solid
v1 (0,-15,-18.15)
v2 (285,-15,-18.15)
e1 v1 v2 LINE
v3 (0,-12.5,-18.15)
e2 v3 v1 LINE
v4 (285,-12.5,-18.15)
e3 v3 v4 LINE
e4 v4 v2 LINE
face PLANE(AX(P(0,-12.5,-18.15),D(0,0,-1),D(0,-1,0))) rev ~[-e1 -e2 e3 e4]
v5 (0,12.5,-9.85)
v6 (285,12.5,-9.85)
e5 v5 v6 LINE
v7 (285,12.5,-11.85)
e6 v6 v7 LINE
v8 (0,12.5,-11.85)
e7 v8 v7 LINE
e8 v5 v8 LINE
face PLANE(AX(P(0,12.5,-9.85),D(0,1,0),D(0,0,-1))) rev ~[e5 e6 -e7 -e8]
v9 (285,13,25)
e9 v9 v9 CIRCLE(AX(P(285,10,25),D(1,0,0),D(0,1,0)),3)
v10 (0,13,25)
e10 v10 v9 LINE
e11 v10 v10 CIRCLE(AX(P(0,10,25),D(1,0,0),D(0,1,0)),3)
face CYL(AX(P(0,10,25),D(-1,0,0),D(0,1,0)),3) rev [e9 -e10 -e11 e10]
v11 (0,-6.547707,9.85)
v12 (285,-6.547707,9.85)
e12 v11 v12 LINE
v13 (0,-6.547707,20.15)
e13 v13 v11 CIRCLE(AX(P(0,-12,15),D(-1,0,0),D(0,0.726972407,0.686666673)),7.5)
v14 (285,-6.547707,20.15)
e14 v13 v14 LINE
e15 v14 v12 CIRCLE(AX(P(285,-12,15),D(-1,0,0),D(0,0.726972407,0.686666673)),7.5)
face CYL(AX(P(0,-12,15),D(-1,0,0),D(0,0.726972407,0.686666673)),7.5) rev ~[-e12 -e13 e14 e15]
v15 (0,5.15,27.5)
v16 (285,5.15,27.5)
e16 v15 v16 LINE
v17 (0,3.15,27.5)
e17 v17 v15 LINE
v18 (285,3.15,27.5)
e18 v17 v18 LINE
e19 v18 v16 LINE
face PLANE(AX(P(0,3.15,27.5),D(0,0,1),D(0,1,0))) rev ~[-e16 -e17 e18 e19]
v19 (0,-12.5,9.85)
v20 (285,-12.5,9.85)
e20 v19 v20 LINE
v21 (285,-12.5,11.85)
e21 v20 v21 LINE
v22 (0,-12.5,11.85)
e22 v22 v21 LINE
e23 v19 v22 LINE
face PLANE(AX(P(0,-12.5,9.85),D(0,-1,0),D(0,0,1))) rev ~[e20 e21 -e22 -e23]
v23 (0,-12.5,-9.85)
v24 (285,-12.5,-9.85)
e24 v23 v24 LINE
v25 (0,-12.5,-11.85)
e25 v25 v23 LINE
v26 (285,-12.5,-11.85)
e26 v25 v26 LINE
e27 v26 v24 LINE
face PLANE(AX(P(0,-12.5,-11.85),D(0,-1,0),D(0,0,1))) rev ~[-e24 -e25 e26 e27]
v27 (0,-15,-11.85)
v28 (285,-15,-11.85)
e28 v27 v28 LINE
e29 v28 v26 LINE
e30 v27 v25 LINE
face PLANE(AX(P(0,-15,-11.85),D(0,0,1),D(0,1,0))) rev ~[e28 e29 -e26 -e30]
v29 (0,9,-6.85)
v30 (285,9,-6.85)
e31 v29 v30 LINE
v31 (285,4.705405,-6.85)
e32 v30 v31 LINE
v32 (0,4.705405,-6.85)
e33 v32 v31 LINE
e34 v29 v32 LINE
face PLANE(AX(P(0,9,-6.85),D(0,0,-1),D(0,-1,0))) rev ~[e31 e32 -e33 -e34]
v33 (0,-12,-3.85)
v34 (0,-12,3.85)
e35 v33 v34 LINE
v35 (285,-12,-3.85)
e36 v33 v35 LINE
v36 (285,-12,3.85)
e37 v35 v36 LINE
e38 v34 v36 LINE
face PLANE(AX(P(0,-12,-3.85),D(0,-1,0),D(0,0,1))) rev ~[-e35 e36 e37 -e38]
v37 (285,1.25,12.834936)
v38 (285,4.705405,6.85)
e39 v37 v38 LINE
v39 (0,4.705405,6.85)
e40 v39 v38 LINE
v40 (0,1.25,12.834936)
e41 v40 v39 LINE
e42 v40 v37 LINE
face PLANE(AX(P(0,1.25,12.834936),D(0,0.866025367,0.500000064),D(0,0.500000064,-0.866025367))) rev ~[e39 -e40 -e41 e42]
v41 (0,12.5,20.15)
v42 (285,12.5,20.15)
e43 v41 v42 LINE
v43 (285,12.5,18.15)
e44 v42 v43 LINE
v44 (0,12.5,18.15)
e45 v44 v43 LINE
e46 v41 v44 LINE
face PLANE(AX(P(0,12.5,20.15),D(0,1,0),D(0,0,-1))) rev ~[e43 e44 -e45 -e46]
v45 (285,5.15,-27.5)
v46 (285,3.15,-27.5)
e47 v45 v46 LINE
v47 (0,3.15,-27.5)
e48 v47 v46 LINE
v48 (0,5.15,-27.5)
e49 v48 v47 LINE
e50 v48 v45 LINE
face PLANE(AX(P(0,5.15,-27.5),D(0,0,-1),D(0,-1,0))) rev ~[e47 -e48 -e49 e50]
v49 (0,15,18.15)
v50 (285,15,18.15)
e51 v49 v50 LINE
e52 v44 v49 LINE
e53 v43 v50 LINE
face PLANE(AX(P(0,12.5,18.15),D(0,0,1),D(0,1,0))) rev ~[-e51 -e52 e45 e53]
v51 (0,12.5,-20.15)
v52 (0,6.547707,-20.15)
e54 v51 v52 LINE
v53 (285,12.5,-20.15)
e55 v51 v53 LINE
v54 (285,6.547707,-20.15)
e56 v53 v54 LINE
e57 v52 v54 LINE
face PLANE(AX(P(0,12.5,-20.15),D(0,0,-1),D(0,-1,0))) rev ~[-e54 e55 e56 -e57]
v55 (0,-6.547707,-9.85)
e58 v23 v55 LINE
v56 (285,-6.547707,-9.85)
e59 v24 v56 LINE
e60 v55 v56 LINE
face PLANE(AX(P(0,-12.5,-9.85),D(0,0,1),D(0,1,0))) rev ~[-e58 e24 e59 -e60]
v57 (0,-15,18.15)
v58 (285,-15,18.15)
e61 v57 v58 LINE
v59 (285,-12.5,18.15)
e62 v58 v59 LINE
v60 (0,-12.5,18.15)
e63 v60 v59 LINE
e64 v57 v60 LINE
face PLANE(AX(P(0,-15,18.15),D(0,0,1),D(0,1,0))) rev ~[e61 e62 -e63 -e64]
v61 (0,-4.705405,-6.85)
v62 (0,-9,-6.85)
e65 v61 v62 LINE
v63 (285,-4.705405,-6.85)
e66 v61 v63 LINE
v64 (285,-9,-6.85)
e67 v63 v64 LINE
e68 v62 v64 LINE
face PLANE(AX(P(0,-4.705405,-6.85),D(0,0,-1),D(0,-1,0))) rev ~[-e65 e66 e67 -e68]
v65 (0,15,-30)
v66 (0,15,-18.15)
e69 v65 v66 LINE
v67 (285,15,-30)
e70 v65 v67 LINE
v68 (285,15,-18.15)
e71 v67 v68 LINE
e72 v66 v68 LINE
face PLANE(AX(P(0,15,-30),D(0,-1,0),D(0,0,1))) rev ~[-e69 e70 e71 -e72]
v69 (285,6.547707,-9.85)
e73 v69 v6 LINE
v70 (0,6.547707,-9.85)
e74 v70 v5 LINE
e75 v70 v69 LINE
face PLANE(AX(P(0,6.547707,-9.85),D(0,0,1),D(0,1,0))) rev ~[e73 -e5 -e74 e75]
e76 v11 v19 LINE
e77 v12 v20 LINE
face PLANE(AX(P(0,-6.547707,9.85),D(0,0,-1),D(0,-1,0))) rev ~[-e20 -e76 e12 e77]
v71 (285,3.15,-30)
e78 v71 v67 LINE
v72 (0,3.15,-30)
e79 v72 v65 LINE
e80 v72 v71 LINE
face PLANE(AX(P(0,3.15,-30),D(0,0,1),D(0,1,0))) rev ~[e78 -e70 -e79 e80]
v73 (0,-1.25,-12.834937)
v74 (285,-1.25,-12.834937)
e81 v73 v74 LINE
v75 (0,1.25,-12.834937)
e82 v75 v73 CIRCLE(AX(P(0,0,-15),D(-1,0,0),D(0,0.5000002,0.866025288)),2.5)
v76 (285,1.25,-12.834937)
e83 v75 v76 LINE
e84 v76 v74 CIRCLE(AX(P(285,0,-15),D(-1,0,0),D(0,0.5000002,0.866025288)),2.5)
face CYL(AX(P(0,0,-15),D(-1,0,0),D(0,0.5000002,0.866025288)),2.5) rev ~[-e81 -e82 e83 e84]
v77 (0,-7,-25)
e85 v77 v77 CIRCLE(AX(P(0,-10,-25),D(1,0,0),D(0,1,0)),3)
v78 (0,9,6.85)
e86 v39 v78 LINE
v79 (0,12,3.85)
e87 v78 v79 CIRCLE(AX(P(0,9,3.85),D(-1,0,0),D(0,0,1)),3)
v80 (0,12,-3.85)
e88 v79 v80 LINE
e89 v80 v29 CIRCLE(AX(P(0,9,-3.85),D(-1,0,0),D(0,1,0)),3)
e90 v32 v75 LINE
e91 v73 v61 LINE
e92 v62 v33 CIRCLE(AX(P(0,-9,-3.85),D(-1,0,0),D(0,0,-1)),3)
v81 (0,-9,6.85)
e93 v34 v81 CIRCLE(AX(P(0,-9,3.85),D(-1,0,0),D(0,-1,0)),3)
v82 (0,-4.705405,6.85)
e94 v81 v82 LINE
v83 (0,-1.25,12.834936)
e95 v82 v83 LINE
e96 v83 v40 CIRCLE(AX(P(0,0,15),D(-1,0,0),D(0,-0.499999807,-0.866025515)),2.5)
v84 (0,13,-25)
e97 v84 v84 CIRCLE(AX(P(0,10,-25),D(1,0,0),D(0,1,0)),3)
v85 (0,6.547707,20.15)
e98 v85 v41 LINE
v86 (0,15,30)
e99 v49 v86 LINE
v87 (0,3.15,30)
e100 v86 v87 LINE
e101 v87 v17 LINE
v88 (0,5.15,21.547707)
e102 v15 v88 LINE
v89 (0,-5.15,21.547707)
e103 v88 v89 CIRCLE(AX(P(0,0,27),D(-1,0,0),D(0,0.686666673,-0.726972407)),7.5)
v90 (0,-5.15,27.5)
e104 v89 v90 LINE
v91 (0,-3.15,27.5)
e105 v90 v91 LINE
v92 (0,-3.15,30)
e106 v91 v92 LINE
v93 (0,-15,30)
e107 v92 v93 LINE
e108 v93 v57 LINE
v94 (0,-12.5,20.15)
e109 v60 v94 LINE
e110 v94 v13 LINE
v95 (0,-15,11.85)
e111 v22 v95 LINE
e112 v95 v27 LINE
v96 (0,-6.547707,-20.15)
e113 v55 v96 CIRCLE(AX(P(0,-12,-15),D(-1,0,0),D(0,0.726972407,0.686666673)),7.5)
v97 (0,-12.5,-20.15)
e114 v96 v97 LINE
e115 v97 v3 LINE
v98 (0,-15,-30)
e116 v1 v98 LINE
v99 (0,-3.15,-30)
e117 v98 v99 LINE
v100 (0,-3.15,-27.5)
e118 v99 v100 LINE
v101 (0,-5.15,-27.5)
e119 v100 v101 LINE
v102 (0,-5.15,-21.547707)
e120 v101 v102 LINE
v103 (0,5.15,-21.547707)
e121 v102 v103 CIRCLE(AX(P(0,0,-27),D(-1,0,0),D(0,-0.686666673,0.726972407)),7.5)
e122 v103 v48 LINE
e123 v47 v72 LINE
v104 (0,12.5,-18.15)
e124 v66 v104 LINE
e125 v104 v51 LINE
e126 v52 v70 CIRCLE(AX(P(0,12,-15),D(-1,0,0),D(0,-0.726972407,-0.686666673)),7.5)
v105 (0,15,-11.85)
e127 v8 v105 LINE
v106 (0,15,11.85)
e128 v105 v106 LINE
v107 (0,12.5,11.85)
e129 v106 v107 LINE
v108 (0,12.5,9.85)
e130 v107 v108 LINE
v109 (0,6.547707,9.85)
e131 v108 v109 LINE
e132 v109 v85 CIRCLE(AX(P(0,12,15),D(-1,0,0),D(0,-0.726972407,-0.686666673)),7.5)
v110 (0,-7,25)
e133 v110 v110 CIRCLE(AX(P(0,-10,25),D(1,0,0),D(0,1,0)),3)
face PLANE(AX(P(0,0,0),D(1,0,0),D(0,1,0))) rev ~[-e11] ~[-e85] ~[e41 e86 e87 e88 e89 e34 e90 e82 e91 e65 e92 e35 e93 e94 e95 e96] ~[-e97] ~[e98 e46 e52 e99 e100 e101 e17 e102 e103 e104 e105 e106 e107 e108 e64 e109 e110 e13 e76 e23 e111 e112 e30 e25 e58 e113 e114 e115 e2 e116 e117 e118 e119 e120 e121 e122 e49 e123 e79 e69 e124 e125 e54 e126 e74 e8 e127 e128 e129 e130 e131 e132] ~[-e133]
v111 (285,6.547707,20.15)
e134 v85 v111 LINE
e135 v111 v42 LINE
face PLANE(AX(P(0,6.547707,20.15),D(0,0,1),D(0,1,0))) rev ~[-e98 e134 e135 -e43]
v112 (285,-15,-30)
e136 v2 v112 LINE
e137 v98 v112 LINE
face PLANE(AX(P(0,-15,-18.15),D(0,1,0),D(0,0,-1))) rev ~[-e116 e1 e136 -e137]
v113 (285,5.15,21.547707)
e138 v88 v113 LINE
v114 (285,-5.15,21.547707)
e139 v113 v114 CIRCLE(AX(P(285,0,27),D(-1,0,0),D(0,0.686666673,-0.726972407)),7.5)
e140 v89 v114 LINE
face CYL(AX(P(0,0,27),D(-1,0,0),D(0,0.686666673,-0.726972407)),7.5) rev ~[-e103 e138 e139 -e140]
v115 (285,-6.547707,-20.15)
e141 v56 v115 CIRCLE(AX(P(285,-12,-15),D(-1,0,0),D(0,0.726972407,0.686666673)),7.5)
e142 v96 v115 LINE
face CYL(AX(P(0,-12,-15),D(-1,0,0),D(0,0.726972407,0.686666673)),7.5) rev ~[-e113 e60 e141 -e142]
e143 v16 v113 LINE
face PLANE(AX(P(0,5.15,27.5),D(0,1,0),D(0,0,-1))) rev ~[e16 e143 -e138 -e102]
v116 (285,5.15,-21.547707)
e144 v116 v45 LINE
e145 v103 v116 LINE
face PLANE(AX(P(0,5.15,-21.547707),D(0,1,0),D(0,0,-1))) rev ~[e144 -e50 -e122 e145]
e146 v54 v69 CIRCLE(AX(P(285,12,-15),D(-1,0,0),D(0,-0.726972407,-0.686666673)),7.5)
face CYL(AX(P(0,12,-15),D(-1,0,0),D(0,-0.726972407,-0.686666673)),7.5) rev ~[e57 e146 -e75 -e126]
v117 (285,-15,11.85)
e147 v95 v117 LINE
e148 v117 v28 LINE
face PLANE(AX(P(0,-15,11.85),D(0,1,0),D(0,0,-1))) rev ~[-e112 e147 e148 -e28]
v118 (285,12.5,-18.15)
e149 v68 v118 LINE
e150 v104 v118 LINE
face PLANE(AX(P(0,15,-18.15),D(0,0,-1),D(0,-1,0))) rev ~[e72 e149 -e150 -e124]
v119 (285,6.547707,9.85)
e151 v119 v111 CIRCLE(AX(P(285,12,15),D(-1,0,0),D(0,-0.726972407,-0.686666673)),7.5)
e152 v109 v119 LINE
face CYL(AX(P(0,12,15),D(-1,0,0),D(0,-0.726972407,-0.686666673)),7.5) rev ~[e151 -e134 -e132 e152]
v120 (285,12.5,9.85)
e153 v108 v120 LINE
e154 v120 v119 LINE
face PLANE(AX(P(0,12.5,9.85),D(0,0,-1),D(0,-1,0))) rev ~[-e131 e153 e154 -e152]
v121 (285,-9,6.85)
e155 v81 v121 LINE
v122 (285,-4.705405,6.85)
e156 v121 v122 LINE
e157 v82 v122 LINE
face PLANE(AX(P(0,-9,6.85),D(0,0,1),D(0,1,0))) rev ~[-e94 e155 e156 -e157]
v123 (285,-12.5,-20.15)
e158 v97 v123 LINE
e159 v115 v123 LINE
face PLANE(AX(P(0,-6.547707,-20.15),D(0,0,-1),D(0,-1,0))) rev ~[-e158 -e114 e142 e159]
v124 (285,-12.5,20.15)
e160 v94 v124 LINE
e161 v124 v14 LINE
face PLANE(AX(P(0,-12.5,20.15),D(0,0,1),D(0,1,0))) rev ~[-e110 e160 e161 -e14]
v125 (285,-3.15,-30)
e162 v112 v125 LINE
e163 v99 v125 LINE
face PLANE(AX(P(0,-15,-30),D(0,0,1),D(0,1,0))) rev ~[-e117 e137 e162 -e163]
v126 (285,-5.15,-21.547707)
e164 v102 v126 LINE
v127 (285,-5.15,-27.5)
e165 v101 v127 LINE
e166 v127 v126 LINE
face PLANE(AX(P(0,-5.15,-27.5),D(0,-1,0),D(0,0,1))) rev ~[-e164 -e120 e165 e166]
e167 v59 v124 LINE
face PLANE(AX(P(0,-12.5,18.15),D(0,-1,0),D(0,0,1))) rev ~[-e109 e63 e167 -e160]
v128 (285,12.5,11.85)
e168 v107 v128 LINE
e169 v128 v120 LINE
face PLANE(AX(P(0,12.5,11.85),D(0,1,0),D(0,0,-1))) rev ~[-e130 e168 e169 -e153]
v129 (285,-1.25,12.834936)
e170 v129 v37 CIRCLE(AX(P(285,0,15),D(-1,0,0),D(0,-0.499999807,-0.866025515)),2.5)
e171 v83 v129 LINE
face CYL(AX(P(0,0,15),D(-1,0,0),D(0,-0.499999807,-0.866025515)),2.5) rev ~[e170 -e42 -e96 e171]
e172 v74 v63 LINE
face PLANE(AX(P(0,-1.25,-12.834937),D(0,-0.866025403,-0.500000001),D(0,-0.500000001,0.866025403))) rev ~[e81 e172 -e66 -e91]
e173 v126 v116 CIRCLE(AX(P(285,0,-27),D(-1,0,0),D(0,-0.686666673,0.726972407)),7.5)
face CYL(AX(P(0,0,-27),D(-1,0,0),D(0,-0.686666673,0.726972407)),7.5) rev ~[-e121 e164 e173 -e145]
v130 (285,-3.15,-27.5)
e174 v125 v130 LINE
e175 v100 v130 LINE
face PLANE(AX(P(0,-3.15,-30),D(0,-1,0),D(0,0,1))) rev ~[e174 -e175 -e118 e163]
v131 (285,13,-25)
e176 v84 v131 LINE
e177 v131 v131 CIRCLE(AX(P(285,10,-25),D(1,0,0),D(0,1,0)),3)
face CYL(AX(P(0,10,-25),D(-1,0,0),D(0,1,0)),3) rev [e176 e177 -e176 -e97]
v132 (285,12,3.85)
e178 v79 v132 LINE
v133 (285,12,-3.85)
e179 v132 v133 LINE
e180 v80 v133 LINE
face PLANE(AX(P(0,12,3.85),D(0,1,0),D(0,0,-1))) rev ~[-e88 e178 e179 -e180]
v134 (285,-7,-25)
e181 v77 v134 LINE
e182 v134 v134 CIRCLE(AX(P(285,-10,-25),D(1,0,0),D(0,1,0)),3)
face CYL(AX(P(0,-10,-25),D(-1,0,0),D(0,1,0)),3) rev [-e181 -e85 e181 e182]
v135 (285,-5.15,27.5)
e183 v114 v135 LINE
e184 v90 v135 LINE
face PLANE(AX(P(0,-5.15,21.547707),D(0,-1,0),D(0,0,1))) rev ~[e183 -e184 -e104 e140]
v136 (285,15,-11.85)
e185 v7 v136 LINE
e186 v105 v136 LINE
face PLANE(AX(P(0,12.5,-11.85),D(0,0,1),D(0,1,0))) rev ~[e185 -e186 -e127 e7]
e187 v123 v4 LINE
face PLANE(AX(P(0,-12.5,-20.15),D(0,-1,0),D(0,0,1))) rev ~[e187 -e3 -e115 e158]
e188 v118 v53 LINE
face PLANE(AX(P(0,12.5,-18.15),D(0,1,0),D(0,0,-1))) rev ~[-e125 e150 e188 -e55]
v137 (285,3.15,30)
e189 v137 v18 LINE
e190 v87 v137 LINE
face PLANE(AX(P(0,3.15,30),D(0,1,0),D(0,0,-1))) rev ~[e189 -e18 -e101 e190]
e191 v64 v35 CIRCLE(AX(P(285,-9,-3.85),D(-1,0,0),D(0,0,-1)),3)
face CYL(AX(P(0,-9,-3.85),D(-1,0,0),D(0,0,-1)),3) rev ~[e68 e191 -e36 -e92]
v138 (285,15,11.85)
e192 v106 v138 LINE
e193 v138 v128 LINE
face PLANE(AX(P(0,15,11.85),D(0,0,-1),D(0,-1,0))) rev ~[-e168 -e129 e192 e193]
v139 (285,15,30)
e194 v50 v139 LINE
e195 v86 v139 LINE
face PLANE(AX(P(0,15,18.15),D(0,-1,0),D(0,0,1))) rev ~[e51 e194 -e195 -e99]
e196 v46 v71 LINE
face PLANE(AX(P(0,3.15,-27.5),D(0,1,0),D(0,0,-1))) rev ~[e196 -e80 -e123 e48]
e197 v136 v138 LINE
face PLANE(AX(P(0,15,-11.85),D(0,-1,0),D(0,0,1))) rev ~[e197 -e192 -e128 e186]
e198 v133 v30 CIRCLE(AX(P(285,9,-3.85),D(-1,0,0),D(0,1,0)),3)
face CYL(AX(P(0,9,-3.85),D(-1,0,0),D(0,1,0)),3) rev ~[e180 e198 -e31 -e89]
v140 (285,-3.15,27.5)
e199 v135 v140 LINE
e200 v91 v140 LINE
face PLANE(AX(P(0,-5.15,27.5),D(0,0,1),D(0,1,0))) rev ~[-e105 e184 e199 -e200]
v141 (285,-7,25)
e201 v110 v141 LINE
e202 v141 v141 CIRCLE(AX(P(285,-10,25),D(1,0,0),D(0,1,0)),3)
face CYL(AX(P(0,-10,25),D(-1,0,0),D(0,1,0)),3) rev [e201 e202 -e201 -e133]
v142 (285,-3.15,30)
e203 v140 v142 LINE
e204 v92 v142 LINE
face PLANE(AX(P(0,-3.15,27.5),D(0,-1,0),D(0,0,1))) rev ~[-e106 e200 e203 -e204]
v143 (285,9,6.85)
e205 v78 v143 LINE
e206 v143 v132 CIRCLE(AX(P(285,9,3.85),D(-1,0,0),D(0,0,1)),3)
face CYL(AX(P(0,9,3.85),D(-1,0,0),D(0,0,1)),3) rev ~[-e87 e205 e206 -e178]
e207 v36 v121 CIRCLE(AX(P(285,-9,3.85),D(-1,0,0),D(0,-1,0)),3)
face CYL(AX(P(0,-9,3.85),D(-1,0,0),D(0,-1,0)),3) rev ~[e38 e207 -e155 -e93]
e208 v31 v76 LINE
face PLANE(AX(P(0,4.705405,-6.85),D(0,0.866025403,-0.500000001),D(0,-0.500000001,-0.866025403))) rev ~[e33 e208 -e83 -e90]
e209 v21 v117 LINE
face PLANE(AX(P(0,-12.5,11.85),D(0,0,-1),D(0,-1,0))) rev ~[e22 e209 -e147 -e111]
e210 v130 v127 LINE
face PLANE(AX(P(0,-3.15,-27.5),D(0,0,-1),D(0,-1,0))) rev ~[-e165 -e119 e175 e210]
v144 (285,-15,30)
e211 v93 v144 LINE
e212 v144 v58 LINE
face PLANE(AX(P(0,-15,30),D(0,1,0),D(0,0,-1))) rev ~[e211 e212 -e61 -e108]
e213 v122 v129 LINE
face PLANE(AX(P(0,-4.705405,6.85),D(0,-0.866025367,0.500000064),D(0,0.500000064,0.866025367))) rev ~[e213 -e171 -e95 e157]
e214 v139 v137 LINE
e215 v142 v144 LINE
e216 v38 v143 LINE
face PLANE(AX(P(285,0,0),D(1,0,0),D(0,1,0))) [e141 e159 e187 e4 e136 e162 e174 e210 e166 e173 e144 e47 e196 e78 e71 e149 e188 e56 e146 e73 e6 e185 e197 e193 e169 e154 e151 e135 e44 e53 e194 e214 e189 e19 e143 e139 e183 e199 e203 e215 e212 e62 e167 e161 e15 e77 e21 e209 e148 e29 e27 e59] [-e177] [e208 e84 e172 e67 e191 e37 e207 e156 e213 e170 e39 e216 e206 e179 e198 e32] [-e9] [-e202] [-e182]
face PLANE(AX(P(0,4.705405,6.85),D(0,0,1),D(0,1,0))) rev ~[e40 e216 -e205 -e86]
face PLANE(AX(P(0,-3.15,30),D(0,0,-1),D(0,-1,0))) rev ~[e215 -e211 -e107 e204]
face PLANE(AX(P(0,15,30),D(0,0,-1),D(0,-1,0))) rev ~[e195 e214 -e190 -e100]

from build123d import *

# Parameters (mm, degrees)
F0_R     = 3
F1_DEPTH = 285


# Not quite as in the source:
# - ends of sketch curves that miss each other by under 0.0002 mm in the source are joined


with BuildPart() as f1:
    # F0 (on Right) → F1 (new body)
    with BuildSketch(Plane.YZ):
        with BuildLine():
            Line((12.5, -11.85), (15, -11.85))
            Line((15, -11.85), (15, 11.85))
            Line((15, 11.85), (12.5, 11.85))
            Line((12.5, 11.85), (12.5, 9.85))
            Line((12.5, 9.85), (6.547707, 9.85))
            ThreePointArc((6.5477069495, 9.8499999523), (4.5, 15), (6.5477069495, 20.1500000477))
            Line((6.547707, 20.15), (12.5, 20.15))
            Line((12.5, 20.15), (12.5, 18.15))
            Line((12.5, 18.15), (15, 18.15))
            Line((15, 18.15), (15, 30))
            Line((15, 30), (3.15, 30))
            Line((3.15, 30), (3.15, 27.5))
            Line((3.15, 27.5), (5.15, 27.5))
            Line((5.15, 27.5), (5.15, 21.547707))
            ThreePointArc((5.1500000477, 21.5477069495), (0, 19.5), (-5.1500000477, 21.5477069495))
            Line((-5.15, 21.547707), (-5.15, 27.5))
            Line((-5.15, 27.5), (-3.15, 27.5))
            Line((-3.15, 27.5), (-3.15, 30))
            Line((-3.15, 30), (-15, 30))
            Line((-15, 30), (-15, 18.15))
            Line((-15, 18.15), (-12.5, 18.15))
            Line((-12.5, 18.15), (-12.5, 20.15))
            Line((-12.5, 20.15), (-6.547707, 20.15))
            ThreePointArc((-6.5477069495, 20.1500000477), (-4.5, 15), (-6.5477069495, 9.8499999523))
            Line((-6.547707, 9.85), (-12.5, 9.85))
            Line((-12.5, 9.85), (-12.5, 11.85))
            Line((-12.5, 11.85), (-15, 11.85))
            Line((-15, 11.85), (-15, -11.85))
            Line((-15, -11.85), (-12.5, -11.85))
            Line((-12.5, -11.85), (-12.5, -9.85))
            Line((-12.5, -9.85), (-6.547707, -9.85))
            ThreePointArc((-6.5477069495, -9.8499999523), (-4.5, -15), (-6.5477069495, -20.1500000477))
            Line((-6.547707, -20.15), (-12.5, -20.15))
            Line((-12.5, -20.15), (-12.5, -18.15))
            Line((-12.5, -18.15), (-15, -18.15))
            Line((-15, -18.15), (-15, -30))
            Line((-15, -30), (-3.15, -30))
            Line((-3.15, -30), (-3.15, -27.5))
            Line((-3.15, -27.5), (-5.15, -27.5))
            Line((-5.15, -27.5), (-5.15, -21.547707))
            ThreePointArc((-5.1500000477, -21.5477069495), (0, -19.5), (5.1500000477, -21.5477069495))
            Line((5.15, -21.547707), (5.15, -27.5))
            Line((5.15, -27.5), (3.15, -27.5))
            Line((3.15, -27.5), (3.15, -30))
            Line((3.15, -30), (15, -30))
            Line((15, -30), (15, -18.15))
            Line((15, -18.15), (12.5, -18.15))
            Line((12.5, -18.15), (12.5, -20.15))
            Line((12.5, -20.15), (6.547707, -20.15))
            ThreePointArc((6.5477069495, -20.1500000477), (4.5, -15), (6.5477069495, -9.8499999523))
            Line((6.547707, -9.85), (12.5, -9.85))
            Line((12.5, -9.85), (12.5, -11.85))
        make_face()
        with Locations((-10, -25)):
            Circle(F0_R, mode=Mode.SUBTRACT)
        with Locations((10, -25)):
            Circle(F0_R, mode=Mode.SUBTRACT)
        with Locations((-10, 25)):
            Circle(F0_R, mode=Mode.SUBTRACT)
        with BuildLine():
            ThreePointArc((-12, 3.85), (-11.1213203436, 5.9713203436), (-9, 6.85))
            Line((-9, 6.85), (-4.705405, 6.85))
            Line((-4.705405, 6.85), (-1.25, 12.834936))
            ThreePointArc((-1.25, 12.834936), (0, 17.5), (1.2499997876, 12.8349363679))
            Line((1.2499997876, 12.8349363679), (4.705405, 6.85))
            Line((4.705405, 6.85), (9, 6.85))
            ThreePointArc((9, 6.85), (11.1213203436, 5.9713203436), (12, 3.85))
            Line((12, 3.85), (12, -3.85))
            ThreePointArc((12, -3.85), (11.1213203436, -5.9713203436), (9, -6.85))
            Line((9, -6.85), (4.705405, -6.85))
            Line((4.705405, -6.85), (1.25, -12.834937))
            ThreePointArc((1.25, -12.834937), (0, -17.5), (-1.2500002206, -12.8349366179))
            Line((-1.2500002206, -12.8349366179), (-4.705405, -6.85))
            Line((-4.705405, -6.85), (-9, -6.85))
            ThreePointArc((-9, -6.85), (-11.1213203436, -5.9713203436), (-12, -3.85))
            Line((-12, -3.85), (-12, 3.85))
        make_face(mode=Mode.SUBTRACT)
        with Locations((10, 25)):
            Circle(F0_R, mode=Mode.SUBTRACT)
    extrude(amount=F1_DEPTH)


solid = f1.part
